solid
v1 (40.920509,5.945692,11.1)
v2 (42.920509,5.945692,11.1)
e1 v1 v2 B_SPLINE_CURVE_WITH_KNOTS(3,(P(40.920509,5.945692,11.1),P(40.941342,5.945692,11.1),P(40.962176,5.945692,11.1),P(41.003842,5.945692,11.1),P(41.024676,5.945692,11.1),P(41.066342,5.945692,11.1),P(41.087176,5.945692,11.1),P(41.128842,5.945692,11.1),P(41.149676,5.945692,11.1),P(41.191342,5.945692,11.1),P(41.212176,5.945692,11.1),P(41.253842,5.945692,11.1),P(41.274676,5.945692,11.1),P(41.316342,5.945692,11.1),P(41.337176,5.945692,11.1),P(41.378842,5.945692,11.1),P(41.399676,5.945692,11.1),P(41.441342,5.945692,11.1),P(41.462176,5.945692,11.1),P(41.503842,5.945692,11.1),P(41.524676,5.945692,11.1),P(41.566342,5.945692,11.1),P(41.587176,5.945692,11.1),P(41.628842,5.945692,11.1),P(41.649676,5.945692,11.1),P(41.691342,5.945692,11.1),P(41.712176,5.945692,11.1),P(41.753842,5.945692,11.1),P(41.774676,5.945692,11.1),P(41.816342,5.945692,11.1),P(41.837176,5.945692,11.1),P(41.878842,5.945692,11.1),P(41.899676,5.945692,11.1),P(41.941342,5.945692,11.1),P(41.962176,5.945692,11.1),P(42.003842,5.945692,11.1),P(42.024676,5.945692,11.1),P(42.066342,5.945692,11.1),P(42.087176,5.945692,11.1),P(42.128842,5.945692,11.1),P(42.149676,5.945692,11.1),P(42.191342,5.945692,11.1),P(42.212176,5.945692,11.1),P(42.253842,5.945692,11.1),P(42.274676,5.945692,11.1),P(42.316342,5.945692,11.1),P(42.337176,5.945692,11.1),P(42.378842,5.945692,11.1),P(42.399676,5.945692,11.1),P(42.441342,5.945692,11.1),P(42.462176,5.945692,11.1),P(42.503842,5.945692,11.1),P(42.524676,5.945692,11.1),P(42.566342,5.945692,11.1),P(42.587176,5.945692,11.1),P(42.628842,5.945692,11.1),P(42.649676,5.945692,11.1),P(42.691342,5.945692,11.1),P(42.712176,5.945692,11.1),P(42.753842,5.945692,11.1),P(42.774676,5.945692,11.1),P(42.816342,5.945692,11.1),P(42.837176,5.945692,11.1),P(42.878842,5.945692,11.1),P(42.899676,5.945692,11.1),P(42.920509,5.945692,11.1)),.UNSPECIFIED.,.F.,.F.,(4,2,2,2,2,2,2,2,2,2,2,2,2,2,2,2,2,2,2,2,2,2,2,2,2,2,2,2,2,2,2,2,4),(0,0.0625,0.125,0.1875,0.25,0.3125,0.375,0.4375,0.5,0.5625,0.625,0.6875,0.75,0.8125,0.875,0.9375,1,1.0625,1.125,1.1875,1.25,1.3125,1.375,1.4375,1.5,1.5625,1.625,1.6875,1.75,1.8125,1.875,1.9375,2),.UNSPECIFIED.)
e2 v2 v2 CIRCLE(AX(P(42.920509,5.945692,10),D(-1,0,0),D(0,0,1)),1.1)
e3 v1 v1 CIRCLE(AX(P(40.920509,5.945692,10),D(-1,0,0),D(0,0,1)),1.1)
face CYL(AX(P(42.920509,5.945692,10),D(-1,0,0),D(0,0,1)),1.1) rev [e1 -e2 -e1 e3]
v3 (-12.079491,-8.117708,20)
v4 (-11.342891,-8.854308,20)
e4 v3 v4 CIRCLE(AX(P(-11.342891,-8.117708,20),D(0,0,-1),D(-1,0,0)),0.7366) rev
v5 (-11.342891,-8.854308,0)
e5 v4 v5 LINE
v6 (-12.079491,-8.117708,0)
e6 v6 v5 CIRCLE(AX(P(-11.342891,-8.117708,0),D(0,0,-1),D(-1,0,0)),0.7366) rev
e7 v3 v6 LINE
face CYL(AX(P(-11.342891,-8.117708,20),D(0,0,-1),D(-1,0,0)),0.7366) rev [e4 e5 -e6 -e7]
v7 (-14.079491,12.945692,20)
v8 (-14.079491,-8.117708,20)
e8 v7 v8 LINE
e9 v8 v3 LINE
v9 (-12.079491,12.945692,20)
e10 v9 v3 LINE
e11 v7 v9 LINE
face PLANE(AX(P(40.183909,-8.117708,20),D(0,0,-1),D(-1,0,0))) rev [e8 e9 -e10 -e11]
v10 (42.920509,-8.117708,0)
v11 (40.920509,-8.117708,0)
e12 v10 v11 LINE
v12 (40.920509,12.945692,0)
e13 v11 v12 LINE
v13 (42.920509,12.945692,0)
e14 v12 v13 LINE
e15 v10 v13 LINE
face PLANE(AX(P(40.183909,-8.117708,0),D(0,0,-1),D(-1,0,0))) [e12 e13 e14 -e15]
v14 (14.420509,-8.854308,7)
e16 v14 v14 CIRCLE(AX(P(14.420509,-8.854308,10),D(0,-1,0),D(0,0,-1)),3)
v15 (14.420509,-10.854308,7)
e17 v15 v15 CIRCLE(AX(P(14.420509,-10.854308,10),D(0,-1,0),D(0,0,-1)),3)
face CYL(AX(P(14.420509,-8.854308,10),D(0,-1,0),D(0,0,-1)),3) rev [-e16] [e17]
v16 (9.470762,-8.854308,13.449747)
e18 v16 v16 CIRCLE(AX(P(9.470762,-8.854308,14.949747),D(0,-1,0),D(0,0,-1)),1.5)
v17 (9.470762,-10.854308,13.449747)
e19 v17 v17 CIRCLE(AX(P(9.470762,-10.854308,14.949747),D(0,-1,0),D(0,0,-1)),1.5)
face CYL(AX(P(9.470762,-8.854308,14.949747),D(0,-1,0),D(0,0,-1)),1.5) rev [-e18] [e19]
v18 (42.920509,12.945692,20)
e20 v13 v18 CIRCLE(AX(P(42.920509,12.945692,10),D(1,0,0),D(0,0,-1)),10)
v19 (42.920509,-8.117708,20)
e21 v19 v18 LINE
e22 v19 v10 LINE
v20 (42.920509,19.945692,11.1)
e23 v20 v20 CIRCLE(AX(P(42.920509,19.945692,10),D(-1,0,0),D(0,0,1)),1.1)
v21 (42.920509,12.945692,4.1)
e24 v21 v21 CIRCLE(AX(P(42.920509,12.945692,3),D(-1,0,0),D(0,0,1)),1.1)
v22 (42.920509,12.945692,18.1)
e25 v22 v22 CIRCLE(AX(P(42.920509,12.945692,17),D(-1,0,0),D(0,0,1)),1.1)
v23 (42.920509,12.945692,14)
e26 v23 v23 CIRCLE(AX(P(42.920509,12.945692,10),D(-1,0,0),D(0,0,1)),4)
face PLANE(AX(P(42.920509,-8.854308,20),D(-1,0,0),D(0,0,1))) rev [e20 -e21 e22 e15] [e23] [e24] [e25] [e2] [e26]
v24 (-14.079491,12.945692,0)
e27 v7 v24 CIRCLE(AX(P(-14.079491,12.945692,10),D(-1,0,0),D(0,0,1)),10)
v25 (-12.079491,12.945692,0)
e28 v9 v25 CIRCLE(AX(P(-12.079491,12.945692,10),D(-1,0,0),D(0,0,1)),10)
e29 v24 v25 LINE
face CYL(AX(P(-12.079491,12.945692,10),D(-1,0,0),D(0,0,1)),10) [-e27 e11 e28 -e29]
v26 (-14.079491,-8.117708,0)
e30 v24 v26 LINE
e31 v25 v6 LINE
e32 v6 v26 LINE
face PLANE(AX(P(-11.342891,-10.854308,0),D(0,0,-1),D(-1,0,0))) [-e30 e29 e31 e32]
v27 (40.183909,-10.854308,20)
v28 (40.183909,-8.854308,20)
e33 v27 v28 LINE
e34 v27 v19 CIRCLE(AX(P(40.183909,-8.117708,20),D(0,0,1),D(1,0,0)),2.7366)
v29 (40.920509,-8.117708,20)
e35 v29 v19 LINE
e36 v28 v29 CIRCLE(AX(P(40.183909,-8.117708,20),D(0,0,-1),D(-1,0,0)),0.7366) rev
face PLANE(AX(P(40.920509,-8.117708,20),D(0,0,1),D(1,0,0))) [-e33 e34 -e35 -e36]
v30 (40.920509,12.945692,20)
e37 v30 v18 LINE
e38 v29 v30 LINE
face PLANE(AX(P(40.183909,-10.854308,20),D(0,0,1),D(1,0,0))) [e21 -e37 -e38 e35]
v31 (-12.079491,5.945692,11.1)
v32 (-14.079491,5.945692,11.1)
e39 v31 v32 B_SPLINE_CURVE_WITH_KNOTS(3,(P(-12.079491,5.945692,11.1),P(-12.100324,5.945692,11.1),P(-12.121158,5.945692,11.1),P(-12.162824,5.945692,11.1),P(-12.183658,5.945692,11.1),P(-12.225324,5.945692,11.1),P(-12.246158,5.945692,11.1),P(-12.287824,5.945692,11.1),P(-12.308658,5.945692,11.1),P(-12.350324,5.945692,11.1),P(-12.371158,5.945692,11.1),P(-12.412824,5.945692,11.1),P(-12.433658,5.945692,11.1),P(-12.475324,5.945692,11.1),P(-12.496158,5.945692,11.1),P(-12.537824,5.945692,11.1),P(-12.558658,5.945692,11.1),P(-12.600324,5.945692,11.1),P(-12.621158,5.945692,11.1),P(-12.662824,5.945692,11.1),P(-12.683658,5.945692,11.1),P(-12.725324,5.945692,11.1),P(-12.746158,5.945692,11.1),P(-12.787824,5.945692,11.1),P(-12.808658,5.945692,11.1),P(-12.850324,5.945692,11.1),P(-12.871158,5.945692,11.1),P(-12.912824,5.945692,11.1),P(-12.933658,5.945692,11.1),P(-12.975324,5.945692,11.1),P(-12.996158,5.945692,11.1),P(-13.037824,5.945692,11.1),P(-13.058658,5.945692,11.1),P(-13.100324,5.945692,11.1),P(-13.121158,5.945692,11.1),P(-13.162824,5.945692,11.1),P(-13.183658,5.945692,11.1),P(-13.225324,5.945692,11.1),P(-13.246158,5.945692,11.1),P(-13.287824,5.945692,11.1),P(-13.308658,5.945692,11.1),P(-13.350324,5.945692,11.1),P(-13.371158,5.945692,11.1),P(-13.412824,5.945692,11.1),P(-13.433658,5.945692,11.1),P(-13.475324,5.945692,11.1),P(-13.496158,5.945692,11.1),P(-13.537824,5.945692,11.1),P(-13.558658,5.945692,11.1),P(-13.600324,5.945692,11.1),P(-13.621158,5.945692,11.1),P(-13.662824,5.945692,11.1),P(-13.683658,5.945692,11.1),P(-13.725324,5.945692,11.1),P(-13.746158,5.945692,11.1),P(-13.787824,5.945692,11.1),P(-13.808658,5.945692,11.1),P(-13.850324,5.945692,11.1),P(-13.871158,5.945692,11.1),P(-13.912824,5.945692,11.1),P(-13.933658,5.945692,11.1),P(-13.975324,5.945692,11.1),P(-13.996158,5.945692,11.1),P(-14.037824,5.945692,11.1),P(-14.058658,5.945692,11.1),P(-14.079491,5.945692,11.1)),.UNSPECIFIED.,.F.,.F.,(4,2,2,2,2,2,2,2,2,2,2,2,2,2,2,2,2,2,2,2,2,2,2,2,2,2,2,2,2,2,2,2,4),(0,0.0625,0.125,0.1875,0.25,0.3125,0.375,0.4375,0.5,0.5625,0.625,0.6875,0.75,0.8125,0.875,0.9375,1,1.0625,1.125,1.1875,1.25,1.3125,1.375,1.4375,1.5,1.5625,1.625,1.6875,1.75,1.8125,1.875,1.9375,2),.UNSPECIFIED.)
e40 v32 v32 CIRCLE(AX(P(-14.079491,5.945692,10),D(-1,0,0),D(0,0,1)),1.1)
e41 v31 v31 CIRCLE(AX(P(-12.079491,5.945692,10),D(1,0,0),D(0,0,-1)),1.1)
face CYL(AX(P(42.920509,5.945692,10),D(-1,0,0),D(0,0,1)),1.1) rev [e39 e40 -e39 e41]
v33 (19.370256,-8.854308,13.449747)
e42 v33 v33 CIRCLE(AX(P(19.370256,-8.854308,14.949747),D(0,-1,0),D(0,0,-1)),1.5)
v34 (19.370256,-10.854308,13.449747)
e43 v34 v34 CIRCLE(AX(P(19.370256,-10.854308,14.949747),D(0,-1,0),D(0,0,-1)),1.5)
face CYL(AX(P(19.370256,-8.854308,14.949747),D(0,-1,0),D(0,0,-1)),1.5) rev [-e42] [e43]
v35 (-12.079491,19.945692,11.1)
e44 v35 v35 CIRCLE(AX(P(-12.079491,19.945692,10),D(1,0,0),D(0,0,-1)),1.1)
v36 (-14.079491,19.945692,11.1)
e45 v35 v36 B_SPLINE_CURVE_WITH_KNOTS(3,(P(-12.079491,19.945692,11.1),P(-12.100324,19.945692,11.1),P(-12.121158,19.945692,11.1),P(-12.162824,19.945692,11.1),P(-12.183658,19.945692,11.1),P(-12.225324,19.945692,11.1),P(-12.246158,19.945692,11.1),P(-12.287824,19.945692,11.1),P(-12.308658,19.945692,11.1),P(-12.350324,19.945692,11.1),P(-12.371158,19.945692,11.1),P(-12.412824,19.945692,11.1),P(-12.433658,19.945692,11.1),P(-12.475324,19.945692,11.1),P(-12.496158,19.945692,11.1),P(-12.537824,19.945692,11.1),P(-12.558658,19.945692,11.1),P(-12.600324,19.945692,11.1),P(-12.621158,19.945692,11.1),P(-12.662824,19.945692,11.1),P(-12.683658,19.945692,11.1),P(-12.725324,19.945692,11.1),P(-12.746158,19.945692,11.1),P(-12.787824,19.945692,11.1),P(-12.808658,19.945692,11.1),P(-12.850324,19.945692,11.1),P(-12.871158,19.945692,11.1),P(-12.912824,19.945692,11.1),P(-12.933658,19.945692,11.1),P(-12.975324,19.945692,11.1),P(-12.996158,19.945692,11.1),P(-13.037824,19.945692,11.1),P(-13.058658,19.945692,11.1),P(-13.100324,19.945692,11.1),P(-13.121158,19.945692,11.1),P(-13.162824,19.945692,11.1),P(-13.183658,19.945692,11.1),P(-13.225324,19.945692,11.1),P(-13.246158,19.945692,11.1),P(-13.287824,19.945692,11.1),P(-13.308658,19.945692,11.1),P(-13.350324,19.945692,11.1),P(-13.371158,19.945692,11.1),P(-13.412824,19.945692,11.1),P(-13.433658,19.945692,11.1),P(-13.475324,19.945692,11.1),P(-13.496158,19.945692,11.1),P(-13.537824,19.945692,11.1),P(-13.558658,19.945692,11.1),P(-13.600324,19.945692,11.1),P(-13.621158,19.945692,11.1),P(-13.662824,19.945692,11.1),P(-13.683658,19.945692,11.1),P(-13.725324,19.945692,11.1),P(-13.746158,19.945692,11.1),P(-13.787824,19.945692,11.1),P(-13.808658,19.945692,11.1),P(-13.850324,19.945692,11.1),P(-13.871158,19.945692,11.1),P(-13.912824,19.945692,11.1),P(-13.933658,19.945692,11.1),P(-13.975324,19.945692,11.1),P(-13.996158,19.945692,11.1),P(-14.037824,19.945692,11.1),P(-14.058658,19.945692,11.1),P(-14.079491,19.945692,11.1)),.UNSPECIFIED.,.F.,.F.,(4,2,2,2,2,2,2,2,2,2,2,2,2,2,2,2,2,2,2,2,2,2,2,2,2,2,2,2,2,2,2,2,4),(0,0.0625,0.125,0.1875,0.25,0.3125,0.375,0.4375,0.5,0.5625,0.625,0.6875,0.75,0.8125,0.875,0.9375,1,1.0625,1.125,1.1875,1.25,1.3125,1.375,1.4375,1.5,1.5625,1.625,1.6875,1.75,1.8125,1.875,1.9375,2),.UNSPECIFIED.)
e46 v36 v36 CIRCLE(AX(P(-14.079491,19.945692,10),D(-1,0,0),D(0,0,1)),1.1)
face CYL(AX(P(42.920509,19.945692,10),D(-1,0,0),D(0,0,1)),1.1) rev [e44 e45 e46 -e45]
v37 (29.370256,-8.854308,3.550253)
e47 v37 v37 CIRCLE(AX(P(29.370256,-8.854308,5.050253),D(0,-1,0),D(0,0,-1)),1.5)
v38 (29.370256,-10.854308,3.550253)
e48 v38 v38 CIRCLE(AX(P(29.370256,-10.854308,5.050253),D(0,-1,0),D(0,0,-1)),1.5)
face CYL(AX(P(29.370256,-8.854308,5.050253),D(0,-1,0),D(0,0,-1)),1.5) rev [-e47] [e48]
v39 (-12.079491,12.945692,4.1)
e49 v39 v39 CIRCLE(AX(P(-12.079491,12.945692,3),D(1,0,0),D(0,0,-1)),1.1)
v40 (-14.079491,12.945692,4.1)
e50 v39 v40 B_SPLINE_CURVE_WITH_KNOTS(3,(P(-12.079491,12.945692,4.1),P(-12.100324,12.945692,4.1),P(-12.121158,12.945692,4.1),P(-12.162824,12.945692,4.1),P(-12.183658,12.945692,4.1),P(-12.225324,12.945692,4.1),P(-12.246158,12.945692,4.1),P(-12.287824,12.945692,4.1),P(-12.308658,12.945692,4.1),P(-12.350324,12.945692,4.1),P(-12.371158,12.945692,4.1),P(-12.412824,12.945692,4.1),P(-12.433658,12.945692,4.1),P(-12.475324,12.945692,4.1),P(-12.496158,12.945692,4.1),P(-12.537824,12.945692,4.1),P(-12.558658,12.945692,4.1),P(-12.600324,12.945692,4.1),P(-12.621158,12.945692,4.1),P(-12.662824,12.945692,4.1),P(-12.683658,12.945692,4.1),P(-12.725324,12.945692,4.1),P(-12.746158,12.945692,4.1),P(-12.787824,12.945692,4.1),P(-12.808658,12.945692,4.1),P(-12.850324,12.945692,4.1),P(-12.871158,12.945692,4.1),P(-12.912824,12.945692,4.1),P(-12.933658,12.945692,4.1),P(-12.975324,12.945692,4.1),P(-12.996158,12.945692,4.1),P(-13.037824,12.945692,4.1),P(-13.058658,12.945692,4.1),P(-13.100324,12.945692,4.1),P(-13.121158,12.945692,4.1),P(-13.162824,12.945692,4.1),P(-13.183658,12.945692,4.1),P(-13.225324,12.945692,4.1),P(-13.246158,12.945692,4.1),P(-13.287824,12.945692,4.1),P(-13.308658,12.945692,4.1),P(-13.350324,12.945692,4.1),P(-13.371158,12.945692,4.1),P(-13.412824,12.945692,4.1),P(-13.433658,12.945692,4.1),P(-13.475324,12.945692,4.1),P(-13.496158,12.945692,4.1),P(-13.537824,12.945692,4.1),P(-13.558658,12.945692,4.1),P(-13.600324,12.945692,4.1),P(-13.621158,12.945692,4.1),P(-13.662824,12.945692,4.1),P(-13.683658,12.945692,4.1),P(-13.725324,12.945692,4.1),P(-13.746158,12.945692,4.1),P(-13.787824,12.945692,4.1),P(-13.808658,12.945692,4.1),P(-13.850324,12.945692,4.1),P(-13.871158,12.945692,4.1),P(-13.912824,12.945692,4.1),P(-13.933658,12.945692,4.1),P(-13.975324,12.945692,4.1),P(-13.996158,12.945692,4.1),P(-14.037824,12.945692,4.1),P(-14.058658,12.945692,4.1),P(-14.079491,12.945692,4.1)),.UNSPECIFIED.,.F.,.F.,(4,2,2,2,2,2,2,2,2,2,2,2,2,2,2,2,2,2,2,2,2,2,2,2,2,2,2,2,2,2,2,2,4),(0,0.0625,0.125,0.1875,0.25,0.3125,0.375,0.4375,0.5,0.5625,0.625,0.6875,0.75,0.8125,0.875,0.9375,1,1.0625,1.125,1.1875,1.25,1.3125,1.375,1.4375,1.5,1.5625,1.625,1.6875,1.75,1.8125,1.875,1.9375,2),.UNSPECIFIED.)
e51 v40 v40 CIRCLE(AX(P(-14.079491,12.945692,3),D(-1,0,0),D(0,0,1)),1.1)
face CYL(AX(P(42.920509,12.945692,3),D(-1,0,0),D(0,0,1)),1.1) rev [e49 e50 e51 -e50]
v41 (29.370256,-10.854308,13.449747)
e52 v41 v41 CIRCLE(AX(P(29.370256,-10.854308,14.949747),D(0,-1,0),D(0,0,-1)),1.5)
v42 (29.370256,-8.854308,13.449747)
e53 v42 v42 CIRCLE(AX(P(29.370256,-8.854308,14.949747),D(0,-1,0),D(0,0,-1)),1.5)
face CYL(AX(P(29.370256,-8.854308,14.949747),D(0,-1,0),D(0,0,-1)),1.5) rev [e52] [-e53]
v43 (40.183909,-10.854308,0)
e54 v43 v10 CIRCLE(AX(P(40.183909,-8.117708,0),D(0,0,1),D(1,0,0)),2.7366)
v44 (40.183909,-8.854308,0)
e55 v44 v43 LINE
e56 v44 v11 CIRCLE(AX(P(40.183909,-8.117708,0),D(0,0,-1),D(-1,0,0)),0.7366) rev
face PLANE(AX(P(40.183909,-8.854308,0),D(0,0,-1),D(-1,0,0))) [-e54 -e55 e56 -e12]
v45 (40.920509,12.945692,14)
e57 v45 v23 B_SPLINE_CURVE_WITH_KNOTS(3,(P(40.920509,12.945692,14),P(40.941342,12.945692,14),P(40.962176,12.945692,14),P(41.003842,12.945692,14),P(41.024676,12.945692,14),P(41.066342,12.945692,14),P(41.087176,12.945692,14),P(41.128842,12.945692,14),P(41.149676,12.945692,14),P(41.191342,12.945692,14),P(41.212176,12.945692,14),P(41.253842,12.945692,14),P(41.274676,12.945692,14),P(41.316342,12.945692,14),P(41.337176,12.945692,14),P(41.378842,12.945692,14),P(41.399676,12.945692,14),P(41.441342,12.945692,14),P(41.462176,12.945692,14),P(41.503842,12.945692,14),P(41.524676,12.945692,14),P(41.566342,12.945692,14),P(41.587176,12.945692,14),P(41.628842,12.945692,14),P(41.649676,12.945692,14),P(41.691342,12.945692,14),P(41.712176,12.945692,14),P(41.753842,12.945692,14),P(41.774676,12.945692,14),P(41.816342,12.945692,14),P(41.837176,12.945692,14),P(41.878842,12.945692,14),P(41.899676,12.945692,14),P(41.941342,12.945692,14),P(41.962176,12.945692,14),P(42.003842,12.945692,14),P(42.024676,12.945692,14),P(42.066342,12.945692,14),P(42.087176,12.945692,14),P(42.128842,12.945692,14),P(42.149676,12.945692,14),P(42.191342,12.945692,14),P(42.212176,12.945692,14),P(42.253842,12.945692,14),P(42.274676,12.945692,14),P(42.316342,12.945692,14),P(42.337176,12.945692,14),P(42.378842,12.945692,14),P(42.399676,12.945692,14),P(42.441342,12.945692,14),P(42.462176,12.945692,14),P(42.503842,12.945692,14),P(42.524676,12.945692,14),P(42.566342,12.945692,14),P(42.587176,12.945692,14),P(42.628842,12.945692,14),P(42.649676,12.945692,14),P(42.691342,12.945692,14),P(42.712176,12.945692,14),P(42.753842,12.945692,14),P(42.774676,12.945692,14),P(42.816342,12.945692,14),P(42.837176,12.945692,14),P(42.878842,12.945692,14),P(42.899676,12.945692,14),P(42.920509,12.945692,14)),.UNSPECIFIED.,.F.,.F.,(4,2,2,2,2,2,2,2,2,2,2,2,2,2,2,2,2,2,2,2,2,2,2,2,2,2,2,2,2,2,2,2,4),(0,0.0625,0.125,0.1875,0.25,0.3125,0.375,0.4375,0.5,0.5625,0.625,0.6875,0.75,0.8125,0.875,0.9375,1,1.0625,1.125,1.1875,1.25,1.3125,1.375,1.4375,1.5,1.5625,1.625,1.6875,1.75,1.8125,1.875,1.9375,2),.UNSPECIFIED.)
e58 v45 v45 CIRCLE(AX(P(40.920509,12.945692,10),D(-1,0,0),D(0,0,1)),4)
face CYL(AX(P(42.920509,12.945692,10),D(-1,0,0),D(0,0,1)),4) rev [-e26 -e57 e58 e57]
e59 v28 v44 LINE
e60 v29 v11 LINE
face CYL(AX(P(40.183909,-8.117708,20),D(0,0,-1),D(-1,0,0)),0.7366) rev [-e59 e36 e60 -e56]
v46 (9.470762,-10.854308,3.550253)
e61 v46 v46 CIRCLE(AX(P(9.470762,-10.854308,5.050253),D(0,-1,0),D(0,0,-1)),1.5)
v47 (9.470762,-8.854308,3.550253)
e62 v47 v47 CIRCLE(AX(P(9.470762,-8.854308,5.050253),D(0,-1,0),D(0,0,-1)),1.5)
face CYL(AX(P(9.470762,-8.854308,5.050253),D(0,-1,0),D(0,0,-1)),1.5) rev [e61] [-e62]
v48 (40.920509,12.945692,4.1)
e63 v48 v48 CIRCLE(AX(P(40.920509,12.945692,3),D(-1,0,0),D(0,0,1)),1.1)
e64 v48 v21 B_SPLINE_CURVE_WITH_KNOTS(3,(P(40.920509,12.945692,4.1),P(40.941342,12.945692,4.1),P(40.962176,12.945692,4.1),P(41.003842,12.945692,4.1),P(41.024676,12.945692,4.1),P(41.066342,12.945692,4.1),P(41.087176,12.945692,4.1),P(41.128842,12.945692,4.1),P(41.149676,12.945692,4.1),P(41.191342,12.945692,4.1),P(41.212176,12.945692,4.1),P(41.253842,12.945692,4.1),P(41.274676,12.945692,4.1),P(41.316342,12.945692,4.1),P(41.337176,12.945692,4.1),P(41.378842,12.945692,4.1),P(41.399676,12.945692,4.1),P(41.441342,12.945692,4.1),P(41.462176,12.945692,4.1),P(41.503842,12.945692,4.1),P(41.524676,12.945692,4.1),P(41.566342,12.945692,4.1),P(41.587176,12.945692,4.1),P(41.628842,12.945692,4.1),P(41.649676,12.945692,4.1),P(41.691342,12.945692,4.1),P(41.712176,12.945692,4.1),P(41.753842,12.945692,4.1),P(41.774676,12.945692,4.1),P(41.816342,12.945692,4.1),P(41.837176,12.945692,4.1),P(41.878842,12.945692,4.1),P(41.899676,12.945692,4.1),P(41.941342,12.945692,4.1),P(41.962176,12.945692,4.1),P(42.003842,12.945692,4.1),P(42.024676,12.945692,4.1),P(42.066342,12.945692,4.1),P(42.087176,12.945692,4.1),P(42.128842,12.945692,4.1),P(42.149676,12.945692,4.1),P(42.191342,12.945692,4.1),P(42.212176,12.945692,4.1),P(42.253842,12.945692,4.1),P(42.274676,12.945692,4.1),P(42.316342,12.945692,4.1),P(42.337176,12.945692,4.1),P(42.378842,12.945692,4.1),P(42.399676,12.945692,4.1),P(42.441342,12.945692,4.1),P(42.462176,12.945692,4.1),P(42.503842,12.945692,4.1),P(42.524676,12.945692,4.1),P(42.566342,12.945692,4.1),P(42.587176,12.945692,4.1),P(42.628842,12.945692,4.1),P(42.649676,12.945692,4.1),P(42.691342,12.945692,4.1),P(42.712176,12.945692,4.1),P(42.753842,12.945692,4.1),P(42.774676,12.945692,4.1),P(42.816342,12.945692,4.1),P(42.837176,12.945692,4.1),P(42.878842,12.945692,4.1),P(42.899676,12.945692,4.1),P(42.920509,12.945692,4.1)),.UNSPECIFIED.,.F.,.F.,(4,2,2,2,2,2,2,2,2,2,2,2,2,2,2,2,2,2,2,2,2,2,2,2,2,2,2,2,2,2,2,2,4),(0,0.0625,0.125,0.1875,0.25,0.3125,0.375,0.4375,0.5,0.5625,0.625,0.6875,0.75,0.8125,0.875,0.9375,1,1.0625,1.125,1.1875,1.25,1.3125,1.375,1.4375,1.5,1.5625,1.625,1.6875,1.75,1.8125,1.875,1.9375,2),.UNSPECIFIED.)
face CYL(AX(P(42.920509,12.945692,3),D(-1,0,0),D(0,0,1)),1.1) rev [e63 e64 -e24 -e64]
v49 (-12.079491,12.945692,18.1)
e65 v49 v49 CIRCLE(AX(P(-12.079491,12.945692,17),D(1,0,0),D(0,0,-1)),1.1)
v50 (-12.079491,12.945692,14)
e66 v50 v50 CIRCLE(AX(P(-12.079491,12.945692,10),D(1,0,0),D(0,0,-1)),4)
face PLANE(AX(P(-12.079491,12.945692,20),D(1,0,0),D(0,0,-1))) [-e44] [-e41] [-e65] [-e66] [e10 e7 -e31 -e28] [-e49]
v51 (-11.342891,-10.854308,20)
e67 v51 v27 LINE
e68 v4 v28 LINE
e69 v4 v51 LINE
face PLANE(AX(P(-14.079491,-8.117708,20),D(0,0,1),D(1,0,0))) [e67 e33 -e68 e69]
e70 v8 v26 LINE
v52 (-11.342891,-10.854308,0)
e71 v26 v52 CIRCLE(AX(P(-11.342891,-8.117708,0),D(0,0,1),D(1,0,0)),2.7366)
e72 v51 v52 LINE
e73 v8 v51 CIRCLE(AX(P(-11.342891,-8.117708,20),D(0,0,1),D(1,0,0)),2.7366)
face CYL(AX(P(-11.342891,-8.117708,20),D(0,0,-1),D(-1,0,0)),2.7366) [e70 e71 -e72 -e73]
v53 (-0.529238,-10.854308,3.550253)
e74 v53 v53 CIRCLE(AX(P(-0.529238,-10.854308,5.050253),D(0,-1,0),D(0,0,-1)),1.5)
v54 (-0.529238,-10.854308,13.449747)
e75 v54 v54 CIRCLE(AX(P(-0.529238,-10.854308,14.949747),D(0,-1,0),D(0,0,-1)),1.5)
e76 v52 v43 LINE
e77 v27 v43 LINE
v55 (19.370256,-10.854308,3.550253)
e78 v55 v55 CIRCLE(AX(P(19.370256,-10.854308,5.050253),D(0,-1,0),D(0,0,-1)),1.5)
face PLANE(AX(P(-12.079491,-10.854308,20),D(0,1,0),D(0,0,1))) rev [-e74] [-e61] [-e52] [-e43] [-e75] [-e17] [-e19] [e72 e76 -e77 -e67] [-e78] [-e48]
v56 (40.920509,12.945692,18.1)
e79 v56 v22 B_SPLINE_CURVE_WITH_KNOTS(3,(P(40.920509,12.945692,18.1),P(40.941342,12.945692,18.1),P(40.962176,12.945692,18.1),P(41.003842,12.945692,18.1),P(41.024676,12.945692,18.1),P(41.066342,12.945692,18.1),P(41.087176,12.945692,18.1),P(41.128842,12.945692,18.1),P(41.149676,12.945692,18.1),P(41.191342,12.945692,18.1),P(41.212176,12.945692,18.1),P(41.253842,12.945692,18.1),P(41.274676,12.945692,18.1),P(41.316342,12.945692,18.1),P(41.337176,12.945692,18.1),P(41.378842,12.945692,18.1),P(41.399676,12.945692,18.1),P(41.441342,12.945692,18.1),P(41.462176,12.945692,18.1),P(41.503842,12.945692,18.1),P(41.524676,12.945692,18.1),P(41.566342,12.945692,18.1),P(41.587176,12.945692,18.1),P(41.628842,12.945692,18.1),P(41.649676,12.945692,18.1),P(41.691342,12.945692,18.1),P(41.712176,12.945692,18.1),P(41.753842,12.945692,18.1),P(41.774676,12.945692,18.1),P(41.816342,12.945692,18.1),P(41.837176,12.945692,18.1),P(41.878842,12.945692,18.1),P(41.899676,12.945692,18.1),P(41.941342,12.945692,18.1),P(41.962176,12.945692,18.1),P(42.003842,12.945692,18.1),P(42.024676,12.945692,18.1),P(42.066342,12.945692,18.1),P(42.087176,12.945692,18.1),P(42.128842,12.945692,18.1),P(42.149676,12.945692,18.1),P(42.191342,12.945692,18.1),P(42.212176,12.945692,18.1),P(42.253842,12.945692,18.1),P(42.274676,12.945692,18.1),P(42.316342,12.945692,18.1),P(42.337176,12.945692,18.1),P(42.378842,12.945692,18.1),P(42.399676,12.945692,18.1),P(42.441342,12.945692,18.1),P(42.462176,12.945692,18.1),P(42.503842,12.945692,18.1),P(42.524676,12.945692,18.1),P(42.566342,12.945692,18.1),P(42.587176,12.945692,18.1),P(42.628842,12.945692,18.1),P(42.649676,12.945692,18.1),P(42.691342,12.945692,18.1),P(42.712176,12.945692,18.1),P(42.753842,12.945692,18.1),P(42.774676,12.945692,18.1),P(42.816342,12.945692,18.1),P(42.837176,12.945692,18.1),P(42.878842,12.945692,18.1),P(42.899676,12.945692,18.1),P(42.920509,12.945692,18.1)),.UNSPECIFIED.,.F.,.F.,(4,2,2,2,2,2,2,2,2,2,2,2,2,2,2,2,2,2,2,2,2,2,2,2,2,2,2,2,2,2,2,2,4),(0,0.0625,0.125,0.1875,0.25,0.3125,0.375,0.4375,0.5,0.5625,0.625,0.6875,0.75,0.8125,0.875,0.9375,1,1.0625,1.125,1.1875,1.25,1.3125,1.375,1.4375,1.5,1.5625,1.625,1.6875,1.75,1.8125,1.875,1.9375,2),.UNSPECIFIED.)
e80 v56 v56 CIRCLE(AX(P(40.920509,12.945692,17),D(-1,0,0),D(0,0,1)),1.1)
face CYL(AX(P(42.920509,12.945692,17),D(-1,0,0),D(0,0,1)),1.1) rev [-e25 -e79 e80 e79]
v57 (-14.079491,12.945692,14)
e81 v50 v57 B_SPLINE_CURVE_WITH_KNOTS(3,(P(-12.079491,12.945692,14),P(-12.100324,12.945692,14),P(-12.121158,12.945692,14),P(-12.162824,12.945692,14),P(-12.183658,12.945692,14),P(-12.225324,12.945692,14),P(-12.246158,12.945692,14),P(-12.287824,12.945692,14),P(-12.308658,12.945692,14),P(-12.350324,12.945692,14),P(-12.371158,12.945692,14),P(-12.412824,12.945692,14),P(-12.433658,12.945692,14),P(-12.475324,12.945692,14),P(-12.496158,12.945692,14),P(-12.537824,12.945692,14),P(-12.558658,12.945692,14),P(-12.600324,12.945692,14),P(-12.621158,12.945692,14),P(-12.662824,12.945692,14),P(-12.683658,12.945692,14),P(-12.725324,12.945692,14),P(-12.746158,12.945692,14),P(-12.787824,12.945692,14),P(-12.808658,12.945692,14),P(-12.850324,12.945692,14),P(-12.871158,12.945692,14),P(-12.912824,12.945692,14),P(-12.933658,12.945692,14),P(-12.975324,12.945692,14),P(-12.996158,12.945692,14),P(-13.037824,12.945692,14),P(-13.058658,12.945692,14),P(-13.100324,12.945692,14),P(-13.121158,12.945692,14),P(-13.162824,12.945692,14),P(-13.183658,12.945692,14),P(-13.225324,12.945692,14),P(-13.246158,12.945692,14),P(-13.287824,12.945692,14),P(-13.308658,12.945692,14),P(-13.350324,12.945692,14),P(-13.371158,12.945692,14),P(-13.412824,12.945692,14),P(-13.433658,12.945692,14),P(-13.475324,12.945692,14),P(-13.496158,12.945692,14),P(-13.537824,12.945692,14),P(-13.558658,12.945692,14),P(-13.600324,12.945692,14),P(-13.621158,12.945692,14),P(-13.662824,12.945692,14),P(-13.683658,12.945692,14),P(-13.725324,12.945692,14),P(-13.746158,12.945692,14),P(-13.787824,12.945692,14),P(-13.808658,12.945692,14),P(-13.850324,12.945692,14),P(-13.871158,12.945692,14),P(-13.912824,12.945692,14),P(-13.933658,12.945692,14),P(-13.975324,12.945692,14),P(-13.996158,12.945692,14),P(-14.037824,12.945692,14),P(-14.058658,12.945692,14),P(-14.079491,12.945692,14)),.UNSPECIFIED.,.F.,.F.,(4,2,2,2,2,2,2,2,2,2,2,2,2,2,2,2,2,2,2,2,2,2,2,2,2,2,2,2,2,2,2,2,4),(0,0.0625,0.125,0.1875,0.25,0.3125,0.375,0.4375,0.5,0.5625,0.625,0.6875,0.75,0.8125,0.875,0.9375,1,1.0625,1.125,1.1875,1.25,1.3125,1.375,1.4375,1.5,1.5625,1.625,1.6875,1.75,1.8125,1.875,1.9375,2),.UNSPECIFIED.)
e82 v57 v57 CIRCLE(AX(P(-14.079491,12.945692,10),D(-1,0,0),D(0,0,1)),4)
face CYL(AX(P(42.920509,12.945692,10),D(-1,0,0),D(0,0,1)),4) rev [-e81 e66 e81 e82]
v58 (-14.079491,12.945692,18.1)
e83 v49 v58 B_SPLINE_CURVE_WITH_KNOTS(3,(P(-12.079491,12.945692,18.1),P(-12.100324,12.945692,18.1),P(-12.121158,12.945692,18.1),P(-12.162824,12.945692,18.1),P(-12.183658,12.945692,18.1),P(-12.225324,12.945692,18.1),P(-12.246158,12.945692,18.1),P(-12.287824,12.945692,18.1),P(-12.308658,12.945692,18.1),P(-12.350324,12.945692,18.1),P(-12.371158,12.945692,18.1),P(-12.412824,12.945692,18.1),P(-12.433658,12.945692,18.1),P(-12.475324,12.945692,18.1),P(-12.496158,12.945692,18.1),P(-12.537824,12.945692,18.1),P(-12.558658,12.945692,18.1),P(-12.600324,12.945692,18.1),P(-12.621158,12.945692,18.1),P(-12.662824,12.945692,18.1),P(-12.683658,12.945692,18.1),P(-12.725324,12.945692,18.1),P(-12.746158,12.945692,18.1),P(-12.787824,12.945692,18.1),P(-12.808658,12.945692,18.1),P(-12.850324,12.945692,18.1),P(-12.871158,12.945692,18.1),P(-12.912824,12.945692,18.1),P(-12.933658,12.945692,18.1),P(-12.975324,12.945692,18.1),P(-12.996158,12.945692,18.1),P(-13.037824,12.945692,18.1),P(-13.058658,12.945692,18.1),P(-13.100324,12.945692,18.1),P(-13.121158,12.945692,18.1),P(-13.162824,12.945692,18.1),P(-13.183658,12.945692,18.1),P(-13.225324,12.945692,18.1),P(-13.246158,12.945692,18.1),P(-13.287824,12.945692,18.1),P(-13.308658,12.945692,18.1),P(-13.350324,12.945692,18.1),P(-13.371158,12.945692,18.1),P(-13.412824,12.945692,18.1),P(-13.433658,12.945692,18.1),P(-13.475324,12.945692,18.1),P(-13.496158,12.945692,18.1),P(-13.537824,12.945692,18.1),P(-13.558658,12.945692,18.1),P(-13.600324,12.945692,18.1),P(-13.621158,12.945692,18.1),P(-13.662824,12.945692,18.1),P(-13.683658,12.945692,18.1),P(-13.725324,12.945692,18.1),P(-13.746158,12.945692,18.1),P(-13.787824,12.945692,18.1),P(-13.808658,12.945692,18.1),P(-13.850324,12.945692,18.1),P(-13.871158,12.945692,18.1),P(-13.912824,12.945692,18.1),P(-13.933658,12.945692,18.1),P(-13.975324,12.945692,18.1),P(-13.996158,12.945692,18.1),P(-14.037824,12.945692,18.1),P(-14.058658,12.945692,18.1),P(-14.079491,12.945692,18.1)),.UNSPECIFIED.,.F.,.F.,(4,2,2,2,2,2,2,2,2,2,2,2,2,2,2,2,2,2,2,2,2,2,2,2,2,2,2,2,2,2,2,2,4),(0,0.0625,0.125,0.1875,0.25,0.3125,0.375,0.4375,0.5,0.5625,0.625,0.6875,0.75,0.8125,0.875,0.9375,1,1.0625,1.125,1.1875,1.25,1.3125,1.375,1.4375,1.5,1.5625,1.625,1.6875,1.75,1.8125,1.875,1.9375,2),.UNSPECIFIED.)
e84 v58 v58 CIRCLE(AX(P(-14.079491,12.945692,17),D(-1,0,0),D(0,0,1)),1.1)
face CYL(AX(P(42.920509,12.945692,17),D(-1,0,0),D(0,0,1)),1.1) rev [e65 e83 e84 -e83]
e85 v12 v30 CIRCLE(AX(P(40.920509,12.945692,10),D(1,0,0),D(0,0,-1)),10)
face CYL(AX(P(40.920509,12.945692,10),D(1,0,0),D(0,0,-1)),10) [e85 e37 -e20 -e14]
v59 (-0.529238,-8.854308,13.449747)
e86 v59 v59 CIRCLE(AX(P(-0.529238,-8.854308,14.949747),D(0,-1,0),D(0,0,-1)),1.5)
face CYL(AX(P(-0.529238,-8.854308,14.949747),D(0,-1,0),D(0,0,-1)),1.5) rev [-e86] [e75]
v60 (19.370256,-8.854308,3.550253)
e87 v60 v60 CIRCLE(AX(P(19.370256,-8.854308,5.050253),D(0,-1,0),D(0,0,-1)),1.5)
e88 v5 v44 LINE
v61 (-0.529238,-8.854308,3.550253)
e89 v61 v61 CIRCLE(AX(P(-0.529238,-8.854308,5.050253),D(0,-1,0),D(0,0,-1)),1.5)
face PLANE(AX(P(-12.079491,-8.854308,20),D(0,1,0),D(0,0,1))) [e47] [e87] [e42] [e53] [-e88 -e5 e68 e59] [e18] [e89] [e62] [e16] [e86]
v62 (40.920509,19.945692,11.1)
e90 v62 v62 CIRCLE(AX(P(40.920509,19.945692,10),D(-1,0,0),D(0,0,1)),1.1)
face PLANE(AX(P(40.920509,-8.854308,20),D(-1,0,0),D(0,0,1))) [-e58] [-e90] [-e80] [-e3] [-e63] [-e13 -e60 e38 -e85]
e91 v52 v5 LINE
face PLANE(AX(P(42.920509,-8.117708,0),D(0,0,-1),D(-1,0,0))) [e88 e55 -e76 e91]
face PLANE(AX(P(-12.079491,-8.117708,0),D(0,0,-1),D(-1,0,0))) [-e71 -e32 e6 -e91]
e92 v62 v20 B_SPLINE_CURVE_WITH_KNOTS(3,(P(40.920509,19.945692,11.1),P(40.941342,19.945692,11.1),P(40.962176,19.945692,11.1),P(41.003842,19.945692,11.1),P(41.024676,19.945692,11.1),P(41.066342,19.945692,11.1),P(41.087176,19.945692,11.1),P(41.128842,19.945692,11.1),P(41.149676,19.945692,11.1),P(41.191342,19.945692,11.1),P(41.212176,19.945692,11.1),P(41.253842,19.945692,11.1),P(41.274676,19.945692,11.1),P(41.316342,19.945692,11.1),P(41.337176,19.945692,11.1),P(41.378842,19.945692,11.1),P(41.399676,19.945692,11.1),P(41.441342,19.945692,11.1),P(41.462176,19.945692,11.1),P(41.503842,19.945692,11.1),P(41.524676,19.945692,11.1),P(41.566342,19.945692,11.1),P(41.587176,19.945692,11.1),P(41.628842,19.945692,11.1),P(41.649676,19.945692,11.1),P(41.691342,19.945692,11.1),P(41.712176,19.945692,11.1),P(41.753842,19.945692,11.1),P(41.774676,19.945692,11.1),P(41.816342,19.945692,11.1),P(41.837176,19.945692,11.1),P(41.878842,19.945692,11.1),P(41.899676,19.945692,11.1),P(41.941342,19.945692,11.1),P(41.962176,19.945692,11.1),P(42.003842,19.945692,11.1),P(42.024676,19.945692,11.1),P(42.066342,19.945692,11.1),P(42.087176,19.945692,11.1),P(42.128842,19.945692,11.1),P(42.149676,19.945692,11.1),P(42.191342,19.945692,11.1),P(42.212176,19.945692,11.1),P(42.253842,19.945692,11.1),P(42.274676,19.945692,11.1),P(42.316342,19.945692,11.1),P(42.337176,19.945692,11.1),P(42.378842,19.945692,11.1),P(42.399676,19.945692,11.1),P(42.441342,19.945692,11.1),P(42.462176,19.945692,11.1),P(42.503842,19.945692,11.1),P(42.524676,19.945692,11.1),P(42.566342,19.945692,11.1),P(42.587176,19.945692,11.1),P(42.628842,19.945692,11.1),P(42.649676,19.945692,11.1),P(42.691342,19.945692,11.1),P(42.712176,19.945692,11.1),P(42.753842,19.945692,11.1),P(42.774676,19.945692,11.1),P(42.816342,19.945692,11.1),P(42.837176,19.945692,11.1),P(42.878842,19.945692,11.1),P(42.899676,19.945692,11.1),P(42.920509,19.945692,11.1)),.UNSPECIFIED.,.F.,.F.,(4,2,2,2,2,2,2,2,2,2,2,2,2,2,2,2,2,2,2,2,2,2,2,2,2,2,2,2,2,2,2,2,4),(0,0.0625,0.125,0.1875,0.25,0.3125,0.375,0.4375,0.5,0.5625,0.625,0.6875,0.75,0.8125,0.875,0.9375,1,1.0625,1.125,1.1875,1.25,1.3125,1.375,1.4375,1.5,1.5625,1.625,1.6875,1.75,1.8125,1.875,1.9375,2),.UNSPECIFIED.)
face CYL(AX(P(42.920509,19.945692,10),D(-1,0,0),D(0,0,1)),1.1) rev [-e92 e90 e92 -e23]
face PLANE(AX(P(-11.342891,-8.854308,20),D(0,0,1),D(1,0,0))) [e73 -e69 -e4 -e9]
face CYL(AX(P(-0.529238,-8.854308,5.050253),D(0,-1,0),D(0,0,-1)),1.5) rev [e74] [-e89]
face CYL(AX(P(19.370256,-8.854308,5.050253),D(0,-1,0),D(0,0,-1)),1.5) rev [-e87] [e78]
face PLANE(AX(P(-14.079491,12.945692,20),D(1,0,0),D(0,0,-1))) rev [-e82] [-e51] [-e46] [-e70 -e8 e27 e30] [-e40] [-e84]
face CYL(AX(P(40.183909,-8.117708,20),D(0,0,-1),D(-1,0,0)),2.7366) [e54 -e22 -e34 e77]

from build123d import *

# Parameters (mm, degrees)
SM_BASE_FLANGE_1_DEPTH = 20
EXTRUDE_1_DEPTH        = 2
EXTRUDE_START          = -2
EXTRUDE_2_DEPTH        = 2
SKETCH_8_R             = 4
SKETCH_8_R_2           = 1.1
CUT_EXTRUDE_1_DEPTH    = 65.618145883
SKETCH_9_R             = 3
SKETCH_9_R_2           = 1.5
CUT_EXTRUDE_2_DEPTH    = 2


# Sheet-metal steps are written as plain solids
with BuildPart() as part:
    # Sketch 1 → 基体-法兰1 (new body)
    with BuildSketch(Plane.XY):
        with BuildLine():
            Line((-12.079491004, 12.945691914), (-12.079491004, -8.117708086))
            ThreePointArc((-12.079491004, -8.117708086), (-11.863745859, -8.638562941), (-11.342891004, -8.854308086))
            Line((-11.342891004, -8.854308086), (40.183908996, -8.854308086))
            ThreePointArc((40.183908996, -8.854308086), (40.704763851, -8.638562941), (40.920508996, -8.117708086))
            Line((40.920508996, -8.117708086), (40.920508996, 12.945691914))
            Line((40.920508996, 12.945691914), (42.920508996, 12.945691914))
            Line((42.920508996, 12.945691914), (42.920508996, -8.117708086))
            ThreePointArc((42.920508996, -8.117708086), (42.118977413, -10.052776503), (40.183908996, -10.854308086))
            Line((40.183908996, -10.854308086), (-11.342891004, -10.854308086))
            ThreePointArc((-11.342891004, -10.854308086), (-13.277959422, -10.052776503), (-14.079491004, -8.117708086))
            Line((-14.079491004, -8.117708086), (-14.079491004, 12.945691914))
            Line((-14.079491004, 12.945691914), (-12.079491004, 12.945691914))
        make_face()
    extrude(amount=SM_BASE_FLANGE_1_DEPTH)

    # 草图6 → 凸台-拉伸1 (add)
    with BuildSketch(Plane.ZY.offset(14.079491004)):
        with BuildLine():
            Line((0, 12.945691914), (20, 12.945691914))
            ThreePointArc((20, 12.945691914), (10, 22.945691914), (0, 12.945691914))
        make_face()
    extrude(amount=-EXTRUDE_1_DEPTH)

    # 草图7 → 凸台-拉伸2 (add)
    with BuildSketch(Plane(origin=(42.920508996, 0, 0), x_dir=(0, 0, -1), z_dir=(1, 0, 0)).offset(EXTRUDE_START)):
        with BuildLine():
            Line((-20, 12.945691914), (0, 12.945691914))
            ThreePointArc((0, 12.945691914), (-10, 22.945691914), (-20, 12.945691914))
        make_face()
    extrude(amount=EXTRUDE_2_DEPTH)

    # 草图8 → 切除-拉伸1 (cut, through all)
    with BuildSketch(Plane.ZY.offset(14.079491004)):
        with Locations((10, 12.945691914)):
            Circle(SKETCH_8_R)
        with Locations((10, 19.945691914)):
            Circle(SKETCH_8_R_2)
        with Locations((17, 12.945691914)):
            Circle(SKETCH_8_R_2)
        with Locations((10, 5.945691914)):
            Circle(SKETCH_8_R_2)
        with Locations((3, 12.945691914)):
            Circle(SKETCH_8_R_2)
    extrude(amount=-CUT_EXTRUDE_1_DEPTH, mode=Mode.SUBTRACT)

    # 草图9 → 切除-拉伸2 (cut)
    with BuildSketch(Plane(origin=(0, -10.854308086, 0), x_dir=(-1, 0, 0), z_dir=(0, -1, 0))):
        with Locations(Location((-14.420508996, -10, 0), (0, 0, 90))):
            Circle(SKETCH_9_R)
        with Locations(Location((-29.370256464, -5.050252532, 0), (0, 0, 90))):
            Circle(SKETCH_9_R_2)
        with Locations(Location((-19.370256464, -5.050252532, 0), (0, 0, 90))):
            Circle(SKETCH_9_R_2)
        with Locations(Location((-9.470761527, -5.050252532, 0), (0, 0, 90))):
            Circle(SKETCH_9_R_2)
        with Locations(Location((-19.370256464, -14.949747468, 0), (0, 0, 90))):
            Circle(SKETCH_9_R_2)
        with Locations(Location((-9.470761527, -14.949747468, 0), (0, 0, 90))):
            Circle(SKETCH_9_R_2)
        with Locations(Location((-29.370256464, -14.949747468, 0), (0, 0, 90))):
            Circle(SKETCH_9_R_2)
        with Locations(Location((0.529238473, -5.050252532, 0), (0, 0, 90))):
            Circle(SKETCH_9_R_2)
        with Locations(Location((0.529238473, -14.949747468, 0), (0, 0, 90))):
            Circle(SKETCH_9_R_2)
    extrude(amount=-CUT_EXTRUDE_2_DEPTH, mode=Mode.SUBTRACT)


solid = part.part
